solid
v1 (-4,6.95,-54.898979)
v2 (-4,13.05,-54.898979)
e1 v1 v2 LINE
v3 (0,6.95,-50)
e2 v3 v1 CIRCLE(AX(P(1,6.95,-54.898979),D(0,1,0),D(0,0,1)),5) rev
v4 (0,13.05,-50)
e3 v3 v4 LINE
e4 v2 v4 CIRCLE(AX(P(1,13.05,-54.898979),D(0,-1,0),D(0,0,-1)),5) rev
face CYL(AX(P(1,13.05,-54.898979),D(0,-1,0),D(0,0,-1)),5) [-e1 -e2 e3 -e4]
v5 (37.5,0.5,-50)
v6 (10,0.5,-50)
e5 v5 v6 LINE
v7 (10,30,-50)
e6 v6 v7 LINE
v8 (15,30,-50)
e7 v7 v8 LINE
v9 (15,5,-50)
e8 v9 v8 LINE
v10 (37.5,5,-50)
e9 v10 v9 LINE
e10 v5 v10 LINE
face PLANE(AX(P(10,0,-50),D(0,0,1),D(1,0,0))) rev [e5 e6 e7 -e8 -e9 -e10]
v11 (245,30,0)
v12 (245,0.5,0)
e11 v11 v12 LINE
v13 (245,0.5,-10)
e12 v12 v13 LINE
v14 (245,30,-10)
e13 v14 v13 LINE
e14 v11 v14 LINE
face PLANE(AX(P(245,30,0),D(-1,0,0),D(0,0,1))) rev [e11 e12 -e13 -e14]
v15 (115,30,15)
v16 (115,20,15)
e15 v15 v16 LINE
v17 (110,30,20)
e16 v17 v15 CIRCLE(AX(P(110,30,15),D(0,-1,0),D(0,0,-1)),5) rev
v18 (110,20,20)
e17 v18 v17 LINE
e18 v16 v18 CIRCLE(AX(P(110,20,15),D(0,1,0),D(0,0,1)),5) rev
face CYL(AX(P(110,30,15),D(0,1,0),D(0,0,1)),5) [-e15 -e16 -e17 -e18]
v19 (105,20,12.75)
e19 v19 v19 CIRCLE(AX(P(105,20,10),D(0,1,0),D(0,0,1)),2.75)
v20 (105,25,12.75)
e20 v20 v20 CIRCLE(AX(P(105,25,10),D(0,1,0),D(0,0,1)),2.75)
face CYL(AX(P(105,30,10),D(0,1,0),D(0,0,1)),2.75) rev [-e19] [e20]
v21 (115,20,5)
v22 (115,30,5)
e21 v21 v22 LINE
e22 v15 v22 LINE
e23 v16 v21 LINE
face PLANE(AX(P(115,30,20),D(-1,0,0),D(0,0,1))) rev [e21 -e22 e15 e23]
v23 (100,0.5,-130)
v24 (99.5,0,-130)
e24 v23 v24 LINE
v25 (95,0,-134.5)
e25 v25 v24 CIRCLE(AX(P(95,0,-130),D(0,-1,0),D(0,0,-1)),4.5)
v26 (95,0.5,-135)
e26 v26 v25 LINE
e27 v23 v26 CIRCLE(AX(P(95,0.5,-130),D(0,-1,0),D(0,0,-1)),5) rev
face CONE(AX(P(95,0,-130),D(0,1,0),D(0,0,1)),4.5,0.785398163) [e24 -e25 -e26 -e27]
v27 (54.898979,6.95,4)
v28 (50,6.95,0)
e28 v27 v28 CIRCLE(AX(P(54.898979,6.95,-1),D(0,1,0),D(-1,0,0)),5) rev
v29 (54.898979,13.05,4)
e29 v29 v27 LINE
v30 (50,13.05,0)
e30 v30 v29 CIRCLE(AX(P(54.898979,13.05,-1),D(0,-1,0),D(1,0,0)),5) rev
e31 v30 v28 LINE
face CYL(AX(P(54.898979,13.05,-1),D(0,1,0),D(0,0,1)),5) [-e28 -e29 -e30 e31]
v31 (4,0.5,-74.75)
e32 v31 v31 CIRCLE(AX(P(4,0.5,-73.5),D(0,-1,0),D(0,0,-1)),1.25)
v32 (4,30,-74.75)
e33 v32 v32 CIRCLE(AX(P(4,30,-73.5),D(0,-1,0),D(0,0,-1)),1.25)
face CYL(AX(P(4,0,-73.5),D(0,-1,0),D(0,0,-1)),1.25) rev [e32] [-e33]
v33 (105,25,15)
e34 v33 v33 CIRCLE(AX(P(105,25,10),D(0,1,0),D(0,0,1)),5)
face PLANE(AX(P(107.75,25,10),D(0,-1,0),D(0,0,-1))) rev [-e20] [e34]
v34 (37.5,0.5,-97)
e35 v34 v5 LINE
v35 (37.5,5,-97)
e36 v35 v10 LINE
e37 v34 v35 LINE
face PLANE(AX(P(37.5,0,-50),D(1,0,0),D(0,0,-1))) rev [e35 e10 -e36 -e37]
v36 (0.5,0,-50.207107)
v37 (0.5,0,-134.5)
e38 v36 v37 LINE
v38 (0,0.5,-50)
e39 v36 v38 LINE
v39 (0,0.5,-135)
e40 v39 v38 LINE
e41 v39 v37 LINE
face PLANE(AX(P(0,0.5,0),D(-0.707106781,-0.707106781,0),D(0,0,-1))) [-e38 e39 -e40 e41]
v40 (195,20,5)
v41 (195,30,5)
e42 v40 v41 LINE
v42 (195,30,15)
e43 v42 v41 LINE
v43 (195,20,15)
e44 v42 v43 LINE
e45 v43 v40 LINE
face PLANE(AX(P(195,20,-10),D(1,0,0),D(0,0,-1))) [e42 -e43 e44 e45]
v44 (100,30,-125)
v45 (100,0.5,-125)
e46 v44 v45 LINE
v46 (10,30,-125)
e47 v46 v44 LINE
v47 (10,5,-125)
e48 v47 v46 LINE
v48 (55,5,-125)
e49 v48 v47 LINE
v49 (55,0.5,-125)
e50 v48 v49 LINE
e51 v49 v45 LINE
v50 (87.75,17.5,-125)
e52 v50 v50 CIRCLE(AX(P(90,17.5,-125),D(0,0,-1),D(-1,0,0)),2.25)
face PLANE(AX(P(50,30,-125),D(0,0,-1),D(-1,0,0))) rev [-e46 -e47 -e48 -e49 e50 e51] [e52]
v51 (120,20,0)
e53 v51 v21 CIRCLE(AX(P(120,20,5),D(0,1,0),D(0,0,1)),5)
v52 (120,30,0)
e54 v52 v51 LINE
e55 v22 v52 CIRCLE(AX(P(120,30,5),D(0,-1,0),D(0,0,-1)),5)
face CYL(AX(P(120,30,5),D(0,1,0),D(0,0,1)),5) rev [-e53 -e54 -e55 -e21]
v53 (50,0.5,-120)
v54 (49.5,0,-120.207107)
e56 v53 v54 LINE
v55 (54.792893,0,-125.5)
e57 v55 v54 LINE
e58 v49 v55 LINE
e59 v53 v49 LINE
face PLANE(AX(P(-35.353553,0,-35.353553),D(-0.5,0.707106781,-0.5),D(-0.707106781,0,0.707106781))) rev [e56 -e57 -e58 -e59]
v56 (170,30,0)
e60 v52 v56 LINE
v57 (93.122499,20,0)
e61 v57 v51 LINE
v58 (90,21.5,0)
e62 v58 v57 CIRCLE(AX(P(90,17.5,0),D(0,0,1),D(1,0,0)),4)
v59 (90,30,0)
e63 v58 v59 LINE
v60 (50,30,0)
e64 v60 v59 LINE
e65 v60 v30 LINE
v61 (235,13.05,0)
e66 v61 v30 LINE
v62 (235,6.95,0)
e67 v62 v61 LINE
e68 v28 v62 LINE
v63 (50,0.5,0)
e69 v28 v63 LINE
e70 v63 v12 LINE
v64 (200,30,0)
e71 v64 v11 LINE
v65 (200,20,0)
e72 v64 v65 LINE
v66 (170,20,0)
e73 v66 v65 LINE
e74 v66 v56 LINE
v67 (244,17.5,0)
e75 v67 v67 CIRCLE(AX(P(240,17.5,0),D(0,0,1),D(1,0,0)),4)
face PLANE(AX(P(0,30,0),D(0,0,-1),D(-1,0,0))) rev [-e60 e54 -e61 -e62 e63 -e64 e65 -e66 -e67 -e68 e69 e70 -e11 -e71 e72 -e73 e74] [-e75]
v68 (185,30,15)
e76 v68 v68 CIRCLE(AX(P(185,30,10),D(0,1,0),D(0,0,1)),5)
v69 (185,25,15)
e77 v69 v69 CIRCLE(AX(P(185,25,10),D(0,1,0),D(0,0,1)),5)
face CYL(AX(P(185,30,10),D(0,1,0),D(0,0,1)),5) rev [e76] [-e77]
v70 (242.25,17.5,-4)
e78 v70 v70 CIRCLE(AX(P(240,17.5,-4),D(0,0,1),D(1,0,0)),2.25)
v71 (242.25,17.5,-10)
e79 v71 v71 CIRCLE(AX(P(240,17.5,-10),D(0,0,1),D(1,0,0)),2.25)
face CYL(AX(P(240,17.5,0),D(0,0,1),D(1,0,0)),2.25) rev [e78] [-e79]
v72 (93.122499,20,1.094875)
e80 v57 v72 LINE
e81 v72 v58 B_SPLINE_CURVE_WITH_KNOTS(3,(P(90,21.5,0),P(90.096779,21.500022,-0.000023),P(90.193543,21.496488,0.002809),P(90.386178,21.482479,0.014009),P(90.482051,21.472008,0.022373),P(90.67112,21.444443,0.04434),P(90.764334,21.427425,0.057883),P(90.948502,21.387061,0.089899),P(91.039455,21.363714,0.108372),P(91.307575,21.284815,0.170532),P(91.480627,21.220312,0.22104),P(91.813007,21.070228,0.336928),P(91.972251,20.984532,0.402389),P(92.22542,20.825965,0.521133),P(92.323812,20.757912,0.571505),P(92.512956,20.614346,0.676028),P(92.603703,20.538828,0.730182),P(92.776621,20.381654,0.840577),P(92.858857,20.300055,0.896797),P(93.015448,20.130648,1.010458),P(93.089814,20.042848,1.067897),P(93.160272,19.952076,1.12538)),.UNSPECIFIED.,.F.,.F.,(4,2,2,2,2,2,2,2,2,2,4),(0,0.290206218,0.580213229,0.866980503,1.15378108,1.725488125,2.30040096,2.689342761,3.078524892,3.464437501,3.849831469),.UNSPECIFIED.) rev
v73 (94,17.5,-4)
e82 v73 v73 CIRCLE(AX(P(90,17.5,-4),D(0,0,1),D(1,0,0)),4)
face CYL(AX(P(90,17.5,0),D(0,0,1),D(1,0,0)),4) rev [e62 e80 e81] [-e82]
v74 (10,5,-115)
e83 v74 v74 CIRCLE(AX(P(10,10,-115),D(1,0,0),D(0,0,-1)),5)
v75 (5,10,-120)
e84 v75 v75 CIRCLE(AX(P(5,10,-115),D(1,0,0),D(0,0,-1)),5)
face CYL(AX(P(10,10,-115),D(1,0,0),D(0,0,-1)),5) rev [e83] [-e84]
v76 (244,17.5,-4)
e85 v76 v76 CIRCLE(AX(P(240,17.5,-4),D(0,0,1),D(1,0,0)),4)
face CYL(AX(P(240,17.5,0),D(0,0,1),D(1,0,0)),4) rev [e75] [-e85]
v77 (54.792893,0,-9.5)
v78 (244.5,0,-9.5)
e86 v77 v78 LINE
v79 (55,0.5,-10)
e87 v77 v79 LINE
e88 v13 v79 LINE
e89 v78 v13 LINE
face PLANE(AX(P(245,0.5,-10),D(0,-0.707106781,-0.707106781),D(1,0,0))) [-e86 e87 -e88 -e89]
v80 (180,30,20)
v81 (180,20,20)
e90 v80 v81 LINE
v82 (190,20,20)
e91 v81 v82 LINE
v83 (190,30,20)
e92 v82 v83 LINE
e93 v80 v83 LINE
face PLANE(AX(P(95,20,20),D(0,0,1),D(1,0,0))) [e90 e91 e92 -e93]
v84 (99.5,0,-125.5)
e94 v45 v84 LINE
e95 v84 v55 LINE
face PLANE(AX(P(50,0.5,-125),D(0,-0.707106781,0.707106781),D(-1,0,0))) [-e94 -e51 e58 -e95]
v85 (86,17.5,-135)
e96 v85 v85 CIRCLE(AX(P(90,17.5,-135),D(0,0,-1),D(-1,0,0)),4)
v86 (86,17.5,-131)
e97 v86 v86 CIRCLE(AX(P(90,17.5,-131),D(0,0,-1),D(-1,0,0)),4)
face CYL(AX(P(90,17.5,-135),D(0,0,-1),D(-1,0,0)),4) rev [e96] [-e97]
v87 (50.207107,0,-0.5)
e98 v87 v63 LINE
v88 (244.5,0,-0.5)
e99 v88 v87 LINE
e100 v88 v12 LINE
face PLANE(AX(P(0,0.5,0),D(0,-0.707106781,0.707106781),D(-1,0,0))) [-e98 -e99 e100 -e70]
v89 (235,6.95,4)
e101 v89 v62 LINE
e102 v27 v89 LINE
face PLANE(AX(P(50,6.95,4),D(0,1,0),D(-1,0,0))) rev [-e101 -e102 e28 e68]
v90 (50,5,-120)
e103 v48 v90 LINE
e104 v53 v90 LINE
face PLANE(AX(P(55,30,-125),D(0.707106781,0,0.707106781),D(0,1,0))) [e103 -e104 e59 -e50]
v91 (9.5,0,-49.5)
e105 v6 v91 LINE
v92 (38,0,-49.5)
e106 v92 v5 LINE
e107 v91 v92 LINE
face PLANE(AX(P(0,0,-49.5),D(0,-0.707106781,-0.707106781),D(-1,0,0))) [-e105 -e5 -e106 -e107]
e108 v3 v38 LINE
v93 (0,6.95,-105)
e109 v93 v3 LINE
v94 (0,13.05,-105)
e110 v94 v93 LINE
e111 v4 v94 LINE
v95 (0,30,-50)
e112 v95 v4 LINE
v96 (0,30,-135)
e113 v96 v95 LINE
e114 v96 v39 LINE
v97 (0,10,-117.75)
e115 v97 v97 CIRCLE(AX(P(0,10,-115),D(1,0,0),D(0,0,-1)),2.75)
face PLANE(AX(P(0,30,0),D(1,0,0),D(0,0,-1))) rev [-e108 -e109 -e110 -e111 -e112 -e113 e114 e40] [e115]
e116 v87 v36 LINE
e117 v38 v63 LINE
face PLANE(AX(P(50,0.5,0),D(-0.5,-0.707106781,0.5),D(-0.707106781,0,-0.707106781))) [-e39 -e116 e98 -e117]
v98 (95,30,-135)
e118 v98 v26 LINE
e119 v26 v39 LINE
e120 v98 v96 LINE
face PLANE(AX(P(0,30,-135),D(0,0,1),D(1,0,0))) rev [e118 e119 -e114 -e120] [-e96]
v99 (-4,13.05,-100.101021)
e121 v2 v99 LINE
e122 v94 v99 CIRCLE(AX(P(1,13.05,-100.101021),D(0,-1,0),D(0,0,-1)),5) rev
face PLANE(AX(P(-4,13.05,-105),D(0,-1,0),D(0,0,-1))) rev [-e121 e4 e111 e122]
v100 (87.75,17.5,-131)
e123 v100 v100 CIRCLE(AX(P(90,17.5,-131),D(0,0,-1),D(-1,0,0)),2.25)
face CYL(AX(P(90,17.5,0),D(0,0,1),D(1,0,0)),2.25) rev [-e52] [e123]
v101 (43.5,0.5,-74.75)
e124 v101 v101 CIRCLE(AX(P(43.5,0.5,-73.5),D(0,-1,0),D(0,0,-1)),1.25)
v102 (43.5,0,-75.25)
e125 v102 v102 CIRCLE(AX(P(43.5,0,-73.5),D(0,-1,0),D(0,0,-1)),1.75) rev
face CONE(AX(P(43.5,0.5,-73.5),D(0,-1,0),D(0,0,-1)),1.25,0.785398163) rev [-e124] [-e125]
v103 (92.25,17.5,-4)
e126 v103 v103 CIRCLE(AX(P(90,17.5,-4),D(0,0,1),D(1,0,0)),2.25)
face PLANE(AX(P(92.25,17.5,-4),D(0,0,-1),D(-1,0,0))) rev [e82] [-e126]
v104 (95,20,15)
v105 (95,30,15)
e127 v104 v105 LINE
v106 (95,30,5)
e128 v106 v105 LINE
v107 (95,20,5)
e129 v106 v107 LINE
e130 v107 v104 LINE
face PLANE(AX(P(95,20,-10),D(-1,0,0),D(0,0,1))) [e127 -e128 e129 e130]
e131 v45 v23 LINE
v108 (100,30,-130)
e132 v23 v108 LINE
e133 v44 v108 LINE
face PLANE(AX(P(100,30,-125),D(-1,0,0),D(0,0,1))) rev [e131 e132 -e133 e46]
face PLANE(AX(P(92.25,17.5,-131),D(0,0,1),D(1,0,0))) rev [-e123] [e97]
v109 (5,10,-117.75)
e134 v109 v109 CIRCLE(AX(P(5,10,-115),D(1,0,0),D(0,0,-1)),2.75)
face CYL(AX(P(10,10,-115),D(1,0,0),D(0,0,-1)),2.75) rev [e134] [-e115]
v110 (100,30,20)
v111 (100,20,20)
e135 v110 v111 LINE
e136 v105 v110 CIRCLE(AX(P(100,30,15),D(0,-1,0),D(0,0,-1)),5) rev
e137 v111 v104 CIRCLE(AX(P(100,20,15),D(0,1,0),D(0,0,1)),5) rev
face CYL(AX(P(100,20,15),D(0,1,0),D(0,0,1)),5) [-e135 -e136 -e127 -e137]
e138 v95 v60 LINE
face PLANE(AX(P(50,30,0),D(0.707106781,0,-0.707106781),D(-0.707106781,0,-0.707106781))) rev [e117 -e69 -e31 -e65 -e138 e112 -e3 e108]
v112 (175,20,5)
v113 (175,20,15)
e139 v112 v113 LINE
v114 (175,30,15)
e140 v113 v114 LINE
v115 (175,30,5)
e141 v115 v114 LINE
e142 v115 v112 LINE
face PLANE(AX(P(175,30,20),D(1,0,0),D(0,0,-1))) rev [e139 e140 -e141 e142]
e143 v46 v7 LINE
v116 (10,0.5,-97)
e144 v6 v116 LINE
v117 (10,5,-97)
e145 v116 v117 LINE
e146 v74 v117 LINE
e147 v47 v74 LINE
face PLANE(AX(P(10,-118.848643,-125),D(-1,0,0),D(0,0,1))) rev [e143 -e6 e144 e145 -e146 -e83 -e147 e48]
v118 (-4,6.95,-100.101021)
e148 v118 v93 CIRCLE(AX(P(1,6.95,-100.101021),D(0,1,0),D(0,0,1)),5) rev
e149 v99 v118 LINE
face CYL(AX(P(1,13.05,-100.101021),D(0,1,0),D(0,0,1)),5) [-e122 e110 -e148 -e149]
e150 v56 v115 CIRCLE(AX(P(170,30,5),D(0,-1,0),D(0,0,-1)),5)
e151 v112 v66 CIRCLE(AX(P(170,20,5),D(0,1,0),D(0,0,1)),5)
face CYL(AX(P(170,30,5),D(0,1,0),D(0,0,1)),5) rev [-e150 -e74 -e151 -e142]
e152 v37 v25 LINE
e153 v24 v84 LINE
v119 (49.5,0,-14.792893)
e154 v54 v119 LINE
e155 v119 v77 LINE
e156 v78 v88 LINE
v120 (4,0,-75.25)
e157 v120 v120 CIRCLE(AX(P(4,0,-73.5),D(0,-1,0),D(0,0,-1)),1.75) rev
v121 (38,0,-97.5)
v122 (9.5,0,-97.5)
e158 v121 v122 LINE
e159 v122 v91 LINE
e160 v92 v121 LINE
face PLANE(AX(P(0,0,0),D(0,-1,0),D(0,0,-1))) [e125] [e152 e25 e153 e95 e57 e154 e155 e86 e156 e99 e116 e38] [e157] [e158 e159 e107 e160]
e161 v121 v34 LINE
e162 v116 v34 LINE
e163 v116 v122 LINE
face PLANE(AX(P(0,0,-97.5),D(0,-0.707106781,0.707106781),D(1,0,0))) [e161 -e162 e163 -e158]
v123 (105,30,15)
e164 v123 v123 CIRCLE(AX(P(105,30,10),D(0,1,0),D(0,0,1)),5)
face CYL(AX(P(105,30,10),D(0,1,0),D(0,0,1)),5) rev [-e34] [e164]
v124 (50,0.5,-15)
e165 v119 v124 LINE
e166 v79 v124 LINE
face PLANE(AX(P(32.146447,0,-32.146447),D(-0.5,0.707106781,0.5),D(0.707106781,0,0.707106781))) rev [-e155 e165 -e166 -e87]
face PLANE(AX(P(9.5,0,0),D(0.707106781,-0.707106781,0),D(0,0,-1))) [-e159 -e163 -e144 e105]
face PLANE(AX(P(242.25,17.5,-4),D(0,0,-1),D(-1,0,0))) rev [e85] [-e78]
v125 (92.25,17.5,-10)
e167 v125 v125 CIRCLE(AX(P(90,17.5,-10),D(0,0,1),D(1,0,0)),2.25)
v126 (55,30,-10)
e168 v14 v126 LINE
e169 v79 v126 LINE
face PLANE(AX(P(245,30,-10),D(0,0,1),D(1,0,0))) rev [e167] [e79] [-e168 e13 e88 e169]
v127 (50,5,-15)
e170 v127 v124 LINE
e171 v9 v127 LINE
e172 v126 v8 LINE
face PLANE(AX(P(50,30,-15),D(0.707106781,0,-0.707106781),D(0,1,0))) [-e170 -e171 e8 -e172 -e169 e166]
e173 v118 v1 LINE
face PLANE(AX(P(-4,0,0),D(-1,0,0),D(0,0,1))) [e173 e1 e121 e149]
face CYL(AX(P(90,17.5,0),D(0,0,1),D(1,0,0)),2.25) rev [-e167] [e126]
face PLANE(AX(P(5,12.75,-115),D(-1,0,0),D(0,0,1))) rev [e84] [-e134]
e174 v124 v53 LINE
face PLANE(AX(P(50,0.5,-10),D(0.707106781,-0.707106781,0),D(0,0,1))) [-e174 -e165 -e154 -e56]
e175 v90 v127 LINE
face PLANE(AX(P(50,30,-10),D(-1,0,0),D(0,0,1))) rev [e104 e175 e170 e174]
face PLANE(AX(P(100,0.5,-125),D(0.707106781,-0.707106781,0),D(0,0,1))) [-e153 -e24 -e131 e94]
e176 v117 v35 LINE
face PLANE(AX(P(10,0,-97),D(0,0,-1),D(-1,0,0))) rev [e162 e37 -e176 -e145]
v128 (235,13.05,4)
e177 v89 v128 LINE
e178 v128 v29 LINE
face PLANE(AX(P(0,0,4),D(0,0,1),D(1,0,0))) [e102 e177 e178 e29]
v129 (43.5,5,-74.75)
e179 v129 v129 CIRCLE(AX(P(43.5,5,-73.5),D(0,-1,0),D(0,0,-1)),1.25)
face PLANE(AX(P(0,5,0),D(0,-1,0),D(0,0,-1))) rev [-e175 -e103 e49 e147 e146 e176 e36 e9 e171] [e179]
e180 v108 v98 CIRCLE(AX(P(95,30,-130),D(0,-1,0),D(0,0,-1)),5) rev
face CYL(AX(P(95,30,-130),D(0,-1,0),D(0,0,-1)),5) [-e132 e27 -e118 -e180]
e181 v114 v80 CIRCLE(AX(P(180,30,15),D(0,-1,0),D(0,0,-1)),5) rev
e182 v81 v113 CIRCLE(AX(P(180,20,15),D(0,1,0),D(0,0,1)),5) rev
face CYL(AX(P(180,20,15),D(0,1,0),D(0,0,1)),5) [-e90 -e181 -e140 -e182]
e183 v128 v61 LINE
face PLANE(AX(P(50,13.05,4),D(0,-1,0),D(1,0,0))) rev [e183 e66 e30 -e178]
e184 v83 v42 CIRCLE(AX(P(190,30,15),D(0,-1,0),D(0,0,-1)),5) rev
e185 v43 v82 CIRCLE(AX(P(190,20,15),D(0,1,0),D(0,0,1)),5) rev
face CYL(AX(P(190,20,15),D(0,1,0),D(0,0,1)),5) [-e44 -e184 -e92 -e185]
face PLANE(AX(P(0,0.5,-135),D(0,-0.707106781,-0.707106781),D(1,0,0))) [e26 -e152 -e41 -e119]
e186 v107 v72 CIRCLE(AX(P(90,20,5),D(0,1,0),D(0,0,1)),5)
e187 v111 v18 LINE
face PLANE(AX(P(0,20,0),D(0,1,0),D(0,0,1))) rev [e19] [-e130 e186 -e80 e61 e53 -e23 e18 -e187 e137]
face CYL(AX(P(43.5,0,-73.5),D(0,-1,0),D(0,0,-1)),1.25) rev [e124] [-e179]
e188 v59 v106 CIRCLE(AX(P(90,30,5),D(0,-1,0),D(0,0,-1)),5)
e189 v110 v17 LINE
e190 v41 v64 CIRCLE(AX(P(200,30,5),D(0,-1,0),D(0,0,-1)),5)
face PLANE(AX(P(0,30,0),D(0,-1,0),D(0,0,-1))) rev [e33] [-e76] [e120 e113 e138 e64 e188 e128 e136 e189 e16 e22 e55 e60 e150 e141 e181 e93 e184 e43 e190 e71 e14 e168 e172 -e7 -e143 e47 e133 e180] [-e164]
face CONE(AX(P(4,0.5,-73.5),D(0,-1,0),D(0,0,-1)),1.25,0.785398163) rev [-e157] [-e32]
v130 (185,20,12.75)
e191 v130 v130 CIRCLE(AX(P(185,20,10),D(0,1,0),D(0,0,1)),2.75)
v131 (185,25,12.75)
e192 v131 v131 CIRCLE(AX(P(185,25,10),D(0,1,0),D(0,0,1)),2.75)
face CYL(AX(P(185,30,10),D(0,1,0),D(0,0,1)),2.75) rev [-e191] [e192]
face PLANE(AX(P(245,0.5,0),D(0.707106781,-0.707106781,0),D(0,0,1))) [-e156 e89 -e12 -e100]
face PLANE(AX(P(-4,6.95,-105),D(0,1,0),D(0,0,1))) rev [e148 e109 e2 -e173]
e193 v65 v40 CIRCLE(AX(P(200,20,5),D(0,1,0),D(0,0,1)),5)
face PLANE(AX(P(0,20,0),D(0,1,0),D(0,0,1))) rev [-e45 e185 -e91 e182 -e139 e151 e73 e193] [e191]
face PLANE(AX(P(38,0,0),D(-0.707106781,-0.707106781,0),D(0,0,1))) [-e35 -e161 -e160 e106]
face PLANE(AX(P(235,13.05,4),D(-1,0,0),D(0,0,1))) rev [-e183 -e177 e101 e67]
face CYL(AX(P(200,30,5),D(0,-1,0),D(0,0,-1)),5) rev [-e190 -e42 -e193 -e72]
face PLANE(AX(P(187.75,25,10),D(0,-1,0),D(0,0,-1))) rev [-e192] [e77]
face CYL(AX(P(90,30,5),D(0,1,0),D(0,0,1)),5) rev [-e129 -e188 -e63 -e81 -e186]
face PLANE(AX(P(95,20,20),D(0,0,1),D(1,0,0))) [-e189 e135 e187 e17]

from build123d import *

# Parameters (mm, degrees)
BOSS_EXTRUDE1_DEPTH            = 30
CUT_EXTRUDE1_DEPTH             = 282.336097933
CHAMFER1_SIZE                  = 5
CBORE_FOR_M4_SHCS2_D           = 4.5
CBORE_FOR_M4_SHCS2_CBORE_D     = 8
CBORE_FOR_M4_SHCS2_CBORE_DEPTH = 4
CBORE_FOR_M4_SHCS1_D           = 4.5
CBORE_FOR_M4_SHCS1_CBORE_D     = 8
CBORE_FOR_M4_SHCS1_CBORE_DEPTH = 4
CUT_EXTRUDE2_DEPTH             = 25
SKETCH11_W                     = 27.5
SKETCH11_H                     = 47
CUT_EXTRUDE3_DEPTH             = 282.336097933
CBORE_FOR_M5_SHCS2_D           = 5.5
CBORE_FOR_M5_SHCS2_CBORE_D     = 10
CBORE_FOR_M5_SHCS2_CBORE_DEPTH = 5
M3X0_5_TAPPED_HOLE1_D          = 2.5
SKETCH21_W                     = 185
SKETCH21_H                     = 6.1
BOSS_EXTRUDE3_DEPTH            = 4
SKETCH22_W                     = 55
SKETCH22_H                     = 6.1
BOSS_EXTRUDE4_DEPTH            = 4
SKETCH23_W                     = 100
SKETCH23_H                     = 30
BOSS_EXTRUDE5_DEPTH            = 10
SKETCH24_W                     = 60
SKETCH24_H                     = 20
CUT_EXTRUDE4_DEPTH             = 10
CBORE_FOR_M5_SHCS3_D           = 5.5
CBORE_FOR_M5_SHCS3_CBORE_D     = 10
CBORE_FOR_M5_SHCS3_CBORE_DEPTH = 5
FILLET1_R                      = 5
CHAMFER2_SIZE                  = 0.5


with BuildPart() as part:
    # Sketch1 → Boss-Extrude1 (new body)
    with BuildSketch(Plane(origin=(0, 0, 0), x_dir=(1, 0, 0), z_dir=(0, 1, 0))):
        Polygon((245, 10), (50, 10), (50, 125), (100, 125), (100, 135), (0, 135), (0, 0), (245, 0), align=None)
    extrude(amount=BOSS_EXTRUDE1_DEPTH)

    # Sketch3 → Cut-Extrude1 (cut, through all)
    with BuildSketch(Plane.XZ):
        Polygon((50, 0), (0, -50), (0, 0), align=None)
    extrude(amount=-CUT_EXTRUDE1_DEPTH, mode=Mode.SUBTRACT)

    # Chamfer1
    chamfer1_edges = [part.edges().sort_by_distance(p)[0] for p in [
        (50, 15, -125),
        (50, 15, -10),
    ]]
    chamfer(chamfer1_edges, length=CHAMFER1_SIZE)

    # CBORE for M4 SHCS2 (through all)
    with Locations(Plane.XY):
        with Locations((240, 17.5), (90, 17.5)):
            CounterBoreHole(CBORE_FOR_M4_SHCS2_D / 2, CBORE_FOR_M4_SHCS2_CBORE_D / 2, CBORE_FOR_M4_SHCS2_CBORE_DEPTH)

    # CBORE for M4 SHCS1 (through all)
    with Locations(Plane(origin=(0, 0, -135), x_dir=(-1, 0, 0), z_dir=(0, 0, -1))):
        with Locations((-90, 17.5)):
            CounterBoreHole(CBORE_FOR_M4_SHCS1_D / 2, CBORE_FOR_M4_SHCS1_CBORE_D / 2, CBORE_FOR_M4_SHCS1_CBORE_DEPTH)

    # Sketch10 → Cut-Extrude2 (cut)
    with BuildSketch(Plane(origin=(0, 30, 0), x_dir=(1, 0, 0), z_dir=(0, 1, 0))):
        Polygon((55, 125), (10, 125), (10, 55), (50, 15), align=None)
    extrude(amount=-CUT_EXTRUDE2_DEPTH, mode=Mode.SUBTRACT)

    # Sketch11 → Cut-Extrude3 (cut, through all)
    with BuildSketch(Plane(origin=(0, 30, 0), x_dir=(1, 0, 0), z_dir=(0, 1, 0))):
        with Locations((23.75, 73.5)):
            Rectangle(SKETCH11_W, SKETCH11_H)
    extrude(amount=-CUT_EXTRUDE3_DEPTH, mode=Mode.SUBTRACT)

    # CBORE for M5 SHCS2 (through all)
    with Locations(Plane(origin=(10, 0, 0), x_dir=(0, 0, -1), z_dir=(1, 0, 0))):
        with Locations((115, 10)):
            CounterBoreHole(CBORE_FOR_M5_SHCS2_D / 2, CBORE_FOR_M5_SHCS2_CBORE_D / 2, CBORE_FOR_M5_SHCS2_CBORE_DEPTH)

    # M3x0.5 Tapped Hole1 (through all)
    with Locations(Plane(origin=(0, 0, 0), x_dir=(-1, 0, 0), z_dir=(0, -1, 0))):
        with Locations((-4, 73.5), (-43.5, 73.5)):
            Hole(M3X0_5_TAPPED_HOLE1_D / 2)

    # Sketch21 → Boss-Extrude3 (add)
    with BuildSketch(Plane.XY):
        with Locations((142.5, 10)):
            Rectangle(SKETCH21_W, SKETCH21_H)
    extrude(amount=BOSS_EXTRUDE3_DEPTH)

    # Sketch22 → Boss-Extrude4 (add)
    with BuildSketch(Plane.ZY):
        with Locations((-77.5, 10)):
            Rectangle(SKETCH22_W, SKETCH22_H)
    extrude(amount=BOSS_EXTRUDE4_DEPTH)

    # Sketch23 → Boss-Extrude5 (add)
    with BuildSketch(Plane(origin=(0, 30, 0), x_dir=(1, 0, 0), z_dir=(0, 1, 0))):
        with Locations((145, -5)):
            Rectangle(SKETCH23_W, SKETCH23_H)
    extrude(amount=-BOSS_EXTRUDE5_DEPTH)

    # Sketch24 → Cut-Extrude4 (cut)
    with BuildSketch(Plane.XZ.offset(-20)):
        with Locations((145, 10)):
            Rectangle(SKETCH24_W, SKETCH24_H)
    extrude(amount=-CUT_EXTRUDE4_DEPTH, mode=Mode.SUBTRACT)

    # CBORE for M5 SHCS3 (through all)
    with Locations(Plane(origin=(0, 30, 0), x_dir=(1, 0, 0), z_dir=(0, 1, 0))):
        with Locations((105, -10), (185, -10)):
            CounterBoreHole(CBORE_FOR_M5_SHCS3_D / 2, CBORE_FOR_M5_SHCS3_CBORE_D / 2, CBORE_FOR_M5_SHCS3_CBORE_DEPTH)

    # Fillet1
    # the kernel refuses this fillet: 5 mm, written as the material it adds along each edge
    with BuildSketch(Plane(origin=(195, 20, 0), x_dir=(1, 0, 0), z_dir=(0, 1, 0)), Plane(origin=(115, 20, 0), x_dir=(1, 0, 0), z_dir=(0, 1, 0))) as fillet1_piece_1:
        with BuildLine():
            CenterArc((FILLET1_R, -FILLET1_R), FILLET1_R, 90, 90)
            Line((0, -FILLET1_R), (0, 0))
            Line((0, 0), (FILLET1_R, 0))
        make_face()
    extrude(amount=10)
    with BuildSketch(Plane(origin=(175, 20, 0), x_dir=(-1, 0, 0), z_dir=(0, 1, 0))) as fillet1_piece_2:
        with BuildLine():
            CenterArc((FILLET1_R, FILLET1_R), FILLET1_R, 180, 90)
            Line((0, FILLET1_R), (0, 0))
            Line((0, 0), (FILLET1_R, 0))
        make_face()
    extrude(amount=10)
    with BuildSketch(Plane(origin=(95, 30, 0), x_dir=(-1, 0, 0), z_dir=(0, -1, 0))) as fillet1_piece_3_section:
        with BuildLine():
            CenterArc((FILLET1_R, -FILLET1_R), FILLET1_R, 90, 90)
            Line((0, -FILLET1_R), (0, 0))
            Line((0, 0), (FILLET1_R, 0))
        make_face()
    fillet1_piece_3 = extrude(amount=10, mode=Mode.PRIVATE)
    fillet1_piece_3 = fillet1_piece_3 - Plane(origin=(90, 17.5, 0), x_dir=(1, 0, 0), z_dir=(0, 0, 1)) * Cylinder(4, 40, mode=Mode.PRIVATE)
    add(fillet1_piece_3)
    # the kernel refuses this fillet: 5 mm, written as the material it takes off along each edge
    with BuildSketch(Plane(origin=(-4, -5.297448714, -105), x_dir=(0, 0, 1), z_dir=(0, 1, 0)), Plane(origin=(50, -5.297448714, 4), x_dir=(1, 0, 0), z_dir=(0, 1, 0))) as fillet1_2_piece_1:
        with BuildLine():
            CenterArc((4.898979486, 5), FILLET1_R, 191.536959033, 78.463040967)
            Line((0, 4), (0, 0))
            Line((0, 0), (4.898979486, 0))
        make_face()
    extrude(amount=30.594897428, mode=Mode.SUBTRACT)
    with BuildSketch(Plane(origin=(-4, 25.297448714, -50), x_dir=(1.0, 0, -1.5791812302263136e-12), z_dir=(0, -1, 0))) as fillet1_2_piece_2:
        with BuildLine():
            CenterArc((5, -4.898979486), FILLET1_R, 101.536959033, 78.463040967)
            Line((0, -4.898979486), (0, 0))
            Line((0, 0), (4, 0))
        make_face()
    extrude(amount=30.594897428, mode=Mode.SUBTRACT)
    with BuildSketch(Plane(origin=(195, 42.5, 20), x_dir=(0, 0, -1), z_dir=(0, -1, 0)), Plane(origin=(95, 42.5, 20), x_dir=(1, 0, 0), z_dir=(0, -1, 0))) as fillet1_2_piece_3:
        with BuildLine():
            CenterArc((FILLET1_R, -FILLET1_R), FILLET1_R, 90, 90)
            Line((0, -FILLET1_R), (0, 0))
            Line((0, 0), (FILLET1_R, 0))
        make_face()
    extrude(amount=35, mode=Mode.SUBTRACT)
    with BuildSketch(Plane(origin=(175, 7.5, 20), x_dir=(1, 0, 0), z_dir=(0, 1, 0)), Plane(origin=(115, 7.5, 20), x_dir=(0, 0, -1), z_dir=(0, 1, 0))) as fillet1_2_piece_4:
        with BuildLine():
            CenterArc((FILLET1_R, FILLET1_R), FILLET1_R, 180, 90)
            Line((0, FILLET1_R), (0, 0))
            Line((0, 0), (FILLET1_R, 0))
        make_face()
    extrude(amount=35, mode=Mode.SUBTRACT)
    with BuildSketch(Plane(origin=(100, -12.5, -135), x_dir=(0, 0, 1), z_dir=(0, 1, 0))) as fillet1_2_piece_5:
        with BuildLine():
            CenterArc((FILLET1_R, -FILLET1_R), FILLET1_R, 90, 90)
            Line((0, -FILLET1_R), (0, 0))
            Line((0, 0), (FILLET1_R, 0))
        make_face()
    extrude(amount=55, mode=Mode.SUBTRACT)

    # Chamfer2
    chamfer2_edges = [part.edges().sort_by_distance(p)[0] for p in [
        (150, 0, -10),
        (10, 0, -73.5),
        (37.5, 0, -73.5),
        (23.75, 0, -50),
        (23.75, 0, -97),
        (245, 0, -5),
        (0, 0, -92.5),
        (42.25, 0, -73.5),
        (2.75, 0, -73.5),
        (47.5, 0, -135),
        (98.535533906, 0, -133.535533906),
        (147.5, 0, 0),
        (25, 0, -25),
        (77.5, 0, -125),
        (50, 0, -67.5),
        (52.5, 0, -122.5),
        (52.5, 0, -12.5),
        (100, 0, -127.5),
    ]]
    chamfer(chamfer2_edges, length=CHAMFER2_SIZE)


solid = part.part
